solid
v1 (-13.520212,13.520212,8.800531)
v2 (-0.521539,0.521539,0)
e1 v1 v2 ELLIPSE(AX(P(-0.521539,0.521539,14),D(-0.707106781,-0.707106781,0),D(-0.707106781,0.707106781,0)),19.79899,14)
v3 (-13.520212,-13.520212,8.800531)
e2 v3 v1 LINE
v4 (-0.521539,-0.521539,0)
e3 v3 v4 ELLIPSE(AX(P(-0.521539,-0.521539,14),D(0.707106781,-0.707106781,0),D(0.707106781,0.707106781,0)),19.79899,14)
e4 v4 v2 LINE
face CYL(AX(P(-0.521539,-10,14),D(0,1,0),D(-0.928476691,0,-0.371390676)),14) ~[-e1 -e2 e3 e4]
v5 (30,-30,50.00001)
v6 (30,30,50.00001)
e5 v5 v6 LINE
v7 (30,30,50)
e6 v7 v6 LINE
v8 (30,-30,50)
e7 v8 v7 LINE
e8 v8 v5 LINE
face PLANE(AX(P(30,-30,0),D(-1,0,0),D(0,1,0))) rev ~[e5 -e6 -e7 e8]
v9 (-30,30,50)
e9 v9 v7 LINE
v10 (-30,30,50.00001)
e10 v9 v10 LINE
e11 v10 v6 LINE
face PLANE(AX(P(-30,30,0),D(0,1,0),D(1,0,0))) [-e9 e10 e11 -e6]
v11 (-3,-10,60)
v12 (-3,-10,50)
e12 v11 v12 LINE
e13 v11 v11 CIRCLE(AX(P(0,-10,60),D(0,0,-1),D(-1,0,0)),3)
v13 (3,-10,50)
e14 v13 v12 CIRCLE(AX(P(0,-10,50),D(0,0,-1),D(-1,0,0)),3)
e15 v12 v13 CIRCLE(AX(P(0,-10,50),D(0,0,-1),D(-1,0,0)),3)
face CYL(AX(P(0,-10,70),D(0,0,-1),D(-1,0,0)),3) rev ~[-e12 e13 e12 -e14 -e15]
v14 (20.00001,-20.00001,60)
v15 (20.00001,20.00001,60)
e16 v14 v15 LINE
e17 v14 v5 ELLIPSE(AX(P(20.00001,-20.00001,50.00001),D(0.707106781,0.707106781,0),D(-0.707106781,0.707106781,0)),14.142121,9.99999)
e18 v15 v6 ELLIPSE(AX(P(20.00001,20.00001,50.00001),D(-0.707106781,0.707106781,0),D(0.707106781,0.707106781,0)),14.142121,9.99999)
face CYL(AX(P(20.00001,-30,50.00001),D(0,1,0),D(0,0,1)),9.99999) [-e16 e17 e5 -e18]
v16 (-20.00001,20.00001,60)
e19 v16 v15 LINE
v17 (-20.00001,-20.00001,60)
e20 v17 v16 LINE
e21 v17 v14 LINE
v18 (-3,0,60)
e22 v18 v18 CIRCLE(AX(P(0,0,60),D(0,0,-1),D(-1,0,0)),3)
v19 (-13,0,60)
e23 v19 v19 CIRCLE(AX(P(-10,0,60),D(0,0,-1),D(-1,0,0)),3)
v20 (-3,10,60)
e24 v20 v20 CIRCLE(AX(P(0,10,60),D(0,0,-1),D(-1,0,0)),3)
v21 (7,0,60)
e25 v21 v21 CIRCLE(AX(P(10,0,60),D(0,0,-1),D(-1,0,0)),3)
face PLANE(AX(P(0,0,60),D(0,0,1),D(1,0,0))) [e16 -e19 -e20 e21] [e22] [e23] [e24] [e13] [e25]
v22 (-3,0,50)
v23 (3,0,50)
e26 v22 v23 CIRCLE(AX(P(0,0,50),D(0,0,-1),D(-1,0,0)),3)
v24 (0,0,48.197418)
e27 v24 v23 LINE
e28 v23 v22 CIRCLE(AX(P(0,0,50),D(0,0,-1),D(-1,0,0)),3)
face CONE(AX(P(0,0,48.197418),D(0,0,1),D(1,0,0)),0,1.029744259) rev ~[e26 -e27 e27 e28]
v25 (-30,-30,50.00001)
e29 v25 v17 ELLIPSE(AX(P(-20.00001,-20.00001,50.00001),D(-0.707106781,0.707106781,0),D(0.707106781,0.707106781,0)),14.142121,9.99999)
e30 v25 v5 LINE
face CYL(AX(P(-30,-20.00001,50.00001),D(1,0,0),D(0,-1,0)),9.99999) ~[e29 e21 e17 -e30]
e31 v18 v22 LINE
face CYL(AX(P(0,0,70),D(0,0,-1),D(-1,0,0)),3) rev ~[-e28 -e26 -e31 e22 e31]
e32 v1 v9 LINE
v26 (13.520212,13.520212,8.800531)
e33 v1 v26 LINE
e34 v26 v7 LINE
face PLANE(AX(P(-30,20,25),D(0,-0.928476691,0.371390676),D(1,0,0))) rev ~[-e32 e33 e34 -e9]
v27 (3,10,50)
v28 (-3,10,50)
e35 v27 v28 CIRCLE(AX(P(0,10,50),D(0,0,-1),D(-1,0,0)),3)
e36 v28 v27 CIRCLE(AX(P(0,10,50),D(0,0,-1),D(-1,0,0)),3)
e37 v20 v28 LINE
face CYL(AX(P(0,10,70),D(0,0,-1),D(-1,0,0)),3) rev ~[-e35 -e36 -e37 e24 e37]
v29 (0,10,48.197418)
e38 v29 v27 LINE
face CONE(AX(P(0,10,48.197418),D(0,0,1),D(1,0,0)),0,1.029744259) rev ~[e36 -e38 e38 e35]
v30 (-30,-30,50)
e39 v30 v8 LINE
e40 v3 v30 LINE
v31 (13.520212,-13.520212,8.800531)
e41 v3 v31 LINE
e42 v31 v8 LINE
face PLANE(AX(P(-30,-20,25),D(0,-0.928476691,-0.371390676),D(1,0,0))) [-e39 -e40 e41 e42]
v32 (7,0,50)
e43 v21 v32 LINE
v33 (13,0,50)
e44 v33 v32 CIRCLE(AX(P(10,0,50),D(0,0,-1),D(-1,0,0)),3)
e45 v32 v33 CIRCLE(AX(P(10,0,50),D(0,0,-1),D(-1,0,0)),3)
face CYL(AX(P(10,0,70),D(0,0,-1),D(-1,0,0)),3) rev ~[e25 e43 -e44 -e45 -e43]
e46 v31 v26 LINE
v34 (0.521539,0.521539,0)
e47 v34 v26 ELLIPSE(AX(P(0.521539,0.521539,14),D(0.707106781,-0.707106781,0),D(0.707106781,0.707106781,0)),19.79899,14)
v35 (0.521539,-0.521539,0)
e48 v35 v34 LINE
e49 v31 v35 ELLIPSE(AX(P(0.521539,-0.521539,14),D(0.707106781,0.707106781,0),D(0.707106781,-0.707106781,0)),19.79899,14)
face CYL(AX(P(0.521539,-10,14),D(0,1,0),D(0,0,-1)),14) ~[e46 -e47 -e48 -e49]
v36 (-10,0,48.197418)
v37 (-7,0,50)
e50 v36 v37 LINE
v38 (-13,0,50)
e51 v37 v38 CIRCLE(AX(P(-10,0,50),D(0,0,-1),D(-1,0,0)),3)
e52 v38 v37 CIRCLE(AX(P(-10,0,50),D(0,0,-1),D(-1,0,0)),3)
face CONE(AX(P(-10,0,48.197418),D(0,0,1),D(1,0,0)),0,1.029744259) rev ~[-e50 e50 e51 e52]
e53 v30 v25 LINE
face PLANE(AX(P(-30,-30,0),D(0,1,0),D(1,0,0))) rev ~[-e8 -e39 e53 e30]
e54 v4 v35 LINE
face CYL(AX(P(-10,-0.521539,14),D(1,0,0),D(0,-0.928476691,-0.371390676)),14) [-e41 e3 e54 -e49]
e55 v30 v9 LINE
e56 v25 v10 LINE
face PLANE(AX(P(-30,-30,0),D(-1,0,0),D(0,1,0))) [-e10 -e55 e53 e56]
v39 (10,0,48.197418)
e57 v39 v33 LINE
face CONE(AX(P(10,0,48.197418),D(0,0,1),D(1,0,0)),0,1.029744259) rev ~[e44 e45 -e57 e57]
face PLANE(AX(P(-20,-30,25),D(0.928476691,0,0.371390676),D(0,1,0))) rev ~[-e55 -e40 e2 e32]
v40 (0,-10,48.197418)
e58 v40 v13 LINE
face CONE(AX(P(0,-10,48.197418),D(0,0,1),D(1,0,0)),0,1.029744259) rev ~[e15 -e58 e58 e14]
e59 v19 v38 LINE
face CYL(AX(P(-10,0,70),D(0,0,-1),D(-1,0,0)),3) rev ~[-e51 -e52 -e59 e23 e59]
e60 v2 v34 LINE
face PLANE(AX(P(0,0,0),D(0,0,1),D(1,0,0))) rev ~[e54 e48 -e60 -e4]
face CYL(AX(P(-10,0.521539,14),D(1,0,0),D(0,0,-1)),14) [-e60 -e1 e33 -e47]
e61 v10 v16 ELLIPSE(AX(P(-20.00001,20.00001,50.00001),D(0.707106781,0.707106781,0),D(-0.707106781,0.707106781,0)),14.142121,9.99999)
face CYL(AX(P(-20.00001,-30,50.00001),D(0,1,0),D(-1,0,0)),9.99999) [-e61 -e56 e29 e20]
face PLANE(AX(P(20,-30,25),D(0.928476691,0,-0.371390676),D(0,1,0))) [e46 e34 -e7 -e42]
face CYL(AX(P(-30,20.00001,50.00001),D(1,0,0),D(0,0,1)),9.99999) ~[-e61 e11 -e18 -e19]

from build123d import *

# Parameters (mm, degrees)
F0_W     = 60
F0_H     = 60
F1_DEPTH = 60
F3_D     = 6
F3_DEPTH = 10
F3_TIP   = 1.8025818571
F4_SIZE2 = 50
F4_SIZE  = 20
F5_R     = 14
F6_R     = 9.99999


# Not quite as in the source:
# - a fillet or chamfer is up to 0.001 mm smaller than in the source, because OpenCascade refuses the exact size


with BuildPart() as f1:
    # F0 (on Top) → F1 (new body)
    with BuildSketch(Plane.XY):
        Rectangle(F0_W, F0_H)
    extrude(amount=F1_DEPTH)

    # F3
    with Locations(Plane.XY.offset(60)):
        with Locations((0, 10), (-10, 0), (10, 0), (0, -10), (0, 0)):
            Hole(F3_D / 2, depth=F3_DEPTH)
            with Locations((0, 0, -(F3_DEPTH + F3_TIP / 2))):  # 118° drill point
                Cone(0, F3_D / 2, F3_TIP, mode=Mode.SUBTRACT)

    # F4
    f4_edges = [f1.edges().sort_by_distance(p)[0] for p in [
        (-30, 0, 0),
        (0, -30, 0),
        (30, 0, 0),
        (0, 30, 0),
    ]]
    f4_side = f1.faces().sort_by_distance((0, 0, 0))[0]
    chamfer(f4_edges, length=F4_SIZE, length2=F4_SIZE2, reference=f4_side)

    # F5
    f5_edges = [f1.edges().sort_by_distance(p)[0] for p in [
        (-10, 0, 0),
        (0, 10, 0),
        (0, -10, 0),
        (10, 0, 0),
    ]]
    fillet(f5_edges, radius=F5_R)

    # F6 (radius 10 in the source; OpenCascade refuses exactly that, so slightly less here)
    f6_edges = [f1.edges().sort_by_distance(p)[0] for p in [
        (-30, 0, 60),
        (0, 30, 60),
        (30, 0, 60),
        (0, -30, 60),
    ]]
    fillet(f6_edges, radius=F6_R)


solid = f1.part
